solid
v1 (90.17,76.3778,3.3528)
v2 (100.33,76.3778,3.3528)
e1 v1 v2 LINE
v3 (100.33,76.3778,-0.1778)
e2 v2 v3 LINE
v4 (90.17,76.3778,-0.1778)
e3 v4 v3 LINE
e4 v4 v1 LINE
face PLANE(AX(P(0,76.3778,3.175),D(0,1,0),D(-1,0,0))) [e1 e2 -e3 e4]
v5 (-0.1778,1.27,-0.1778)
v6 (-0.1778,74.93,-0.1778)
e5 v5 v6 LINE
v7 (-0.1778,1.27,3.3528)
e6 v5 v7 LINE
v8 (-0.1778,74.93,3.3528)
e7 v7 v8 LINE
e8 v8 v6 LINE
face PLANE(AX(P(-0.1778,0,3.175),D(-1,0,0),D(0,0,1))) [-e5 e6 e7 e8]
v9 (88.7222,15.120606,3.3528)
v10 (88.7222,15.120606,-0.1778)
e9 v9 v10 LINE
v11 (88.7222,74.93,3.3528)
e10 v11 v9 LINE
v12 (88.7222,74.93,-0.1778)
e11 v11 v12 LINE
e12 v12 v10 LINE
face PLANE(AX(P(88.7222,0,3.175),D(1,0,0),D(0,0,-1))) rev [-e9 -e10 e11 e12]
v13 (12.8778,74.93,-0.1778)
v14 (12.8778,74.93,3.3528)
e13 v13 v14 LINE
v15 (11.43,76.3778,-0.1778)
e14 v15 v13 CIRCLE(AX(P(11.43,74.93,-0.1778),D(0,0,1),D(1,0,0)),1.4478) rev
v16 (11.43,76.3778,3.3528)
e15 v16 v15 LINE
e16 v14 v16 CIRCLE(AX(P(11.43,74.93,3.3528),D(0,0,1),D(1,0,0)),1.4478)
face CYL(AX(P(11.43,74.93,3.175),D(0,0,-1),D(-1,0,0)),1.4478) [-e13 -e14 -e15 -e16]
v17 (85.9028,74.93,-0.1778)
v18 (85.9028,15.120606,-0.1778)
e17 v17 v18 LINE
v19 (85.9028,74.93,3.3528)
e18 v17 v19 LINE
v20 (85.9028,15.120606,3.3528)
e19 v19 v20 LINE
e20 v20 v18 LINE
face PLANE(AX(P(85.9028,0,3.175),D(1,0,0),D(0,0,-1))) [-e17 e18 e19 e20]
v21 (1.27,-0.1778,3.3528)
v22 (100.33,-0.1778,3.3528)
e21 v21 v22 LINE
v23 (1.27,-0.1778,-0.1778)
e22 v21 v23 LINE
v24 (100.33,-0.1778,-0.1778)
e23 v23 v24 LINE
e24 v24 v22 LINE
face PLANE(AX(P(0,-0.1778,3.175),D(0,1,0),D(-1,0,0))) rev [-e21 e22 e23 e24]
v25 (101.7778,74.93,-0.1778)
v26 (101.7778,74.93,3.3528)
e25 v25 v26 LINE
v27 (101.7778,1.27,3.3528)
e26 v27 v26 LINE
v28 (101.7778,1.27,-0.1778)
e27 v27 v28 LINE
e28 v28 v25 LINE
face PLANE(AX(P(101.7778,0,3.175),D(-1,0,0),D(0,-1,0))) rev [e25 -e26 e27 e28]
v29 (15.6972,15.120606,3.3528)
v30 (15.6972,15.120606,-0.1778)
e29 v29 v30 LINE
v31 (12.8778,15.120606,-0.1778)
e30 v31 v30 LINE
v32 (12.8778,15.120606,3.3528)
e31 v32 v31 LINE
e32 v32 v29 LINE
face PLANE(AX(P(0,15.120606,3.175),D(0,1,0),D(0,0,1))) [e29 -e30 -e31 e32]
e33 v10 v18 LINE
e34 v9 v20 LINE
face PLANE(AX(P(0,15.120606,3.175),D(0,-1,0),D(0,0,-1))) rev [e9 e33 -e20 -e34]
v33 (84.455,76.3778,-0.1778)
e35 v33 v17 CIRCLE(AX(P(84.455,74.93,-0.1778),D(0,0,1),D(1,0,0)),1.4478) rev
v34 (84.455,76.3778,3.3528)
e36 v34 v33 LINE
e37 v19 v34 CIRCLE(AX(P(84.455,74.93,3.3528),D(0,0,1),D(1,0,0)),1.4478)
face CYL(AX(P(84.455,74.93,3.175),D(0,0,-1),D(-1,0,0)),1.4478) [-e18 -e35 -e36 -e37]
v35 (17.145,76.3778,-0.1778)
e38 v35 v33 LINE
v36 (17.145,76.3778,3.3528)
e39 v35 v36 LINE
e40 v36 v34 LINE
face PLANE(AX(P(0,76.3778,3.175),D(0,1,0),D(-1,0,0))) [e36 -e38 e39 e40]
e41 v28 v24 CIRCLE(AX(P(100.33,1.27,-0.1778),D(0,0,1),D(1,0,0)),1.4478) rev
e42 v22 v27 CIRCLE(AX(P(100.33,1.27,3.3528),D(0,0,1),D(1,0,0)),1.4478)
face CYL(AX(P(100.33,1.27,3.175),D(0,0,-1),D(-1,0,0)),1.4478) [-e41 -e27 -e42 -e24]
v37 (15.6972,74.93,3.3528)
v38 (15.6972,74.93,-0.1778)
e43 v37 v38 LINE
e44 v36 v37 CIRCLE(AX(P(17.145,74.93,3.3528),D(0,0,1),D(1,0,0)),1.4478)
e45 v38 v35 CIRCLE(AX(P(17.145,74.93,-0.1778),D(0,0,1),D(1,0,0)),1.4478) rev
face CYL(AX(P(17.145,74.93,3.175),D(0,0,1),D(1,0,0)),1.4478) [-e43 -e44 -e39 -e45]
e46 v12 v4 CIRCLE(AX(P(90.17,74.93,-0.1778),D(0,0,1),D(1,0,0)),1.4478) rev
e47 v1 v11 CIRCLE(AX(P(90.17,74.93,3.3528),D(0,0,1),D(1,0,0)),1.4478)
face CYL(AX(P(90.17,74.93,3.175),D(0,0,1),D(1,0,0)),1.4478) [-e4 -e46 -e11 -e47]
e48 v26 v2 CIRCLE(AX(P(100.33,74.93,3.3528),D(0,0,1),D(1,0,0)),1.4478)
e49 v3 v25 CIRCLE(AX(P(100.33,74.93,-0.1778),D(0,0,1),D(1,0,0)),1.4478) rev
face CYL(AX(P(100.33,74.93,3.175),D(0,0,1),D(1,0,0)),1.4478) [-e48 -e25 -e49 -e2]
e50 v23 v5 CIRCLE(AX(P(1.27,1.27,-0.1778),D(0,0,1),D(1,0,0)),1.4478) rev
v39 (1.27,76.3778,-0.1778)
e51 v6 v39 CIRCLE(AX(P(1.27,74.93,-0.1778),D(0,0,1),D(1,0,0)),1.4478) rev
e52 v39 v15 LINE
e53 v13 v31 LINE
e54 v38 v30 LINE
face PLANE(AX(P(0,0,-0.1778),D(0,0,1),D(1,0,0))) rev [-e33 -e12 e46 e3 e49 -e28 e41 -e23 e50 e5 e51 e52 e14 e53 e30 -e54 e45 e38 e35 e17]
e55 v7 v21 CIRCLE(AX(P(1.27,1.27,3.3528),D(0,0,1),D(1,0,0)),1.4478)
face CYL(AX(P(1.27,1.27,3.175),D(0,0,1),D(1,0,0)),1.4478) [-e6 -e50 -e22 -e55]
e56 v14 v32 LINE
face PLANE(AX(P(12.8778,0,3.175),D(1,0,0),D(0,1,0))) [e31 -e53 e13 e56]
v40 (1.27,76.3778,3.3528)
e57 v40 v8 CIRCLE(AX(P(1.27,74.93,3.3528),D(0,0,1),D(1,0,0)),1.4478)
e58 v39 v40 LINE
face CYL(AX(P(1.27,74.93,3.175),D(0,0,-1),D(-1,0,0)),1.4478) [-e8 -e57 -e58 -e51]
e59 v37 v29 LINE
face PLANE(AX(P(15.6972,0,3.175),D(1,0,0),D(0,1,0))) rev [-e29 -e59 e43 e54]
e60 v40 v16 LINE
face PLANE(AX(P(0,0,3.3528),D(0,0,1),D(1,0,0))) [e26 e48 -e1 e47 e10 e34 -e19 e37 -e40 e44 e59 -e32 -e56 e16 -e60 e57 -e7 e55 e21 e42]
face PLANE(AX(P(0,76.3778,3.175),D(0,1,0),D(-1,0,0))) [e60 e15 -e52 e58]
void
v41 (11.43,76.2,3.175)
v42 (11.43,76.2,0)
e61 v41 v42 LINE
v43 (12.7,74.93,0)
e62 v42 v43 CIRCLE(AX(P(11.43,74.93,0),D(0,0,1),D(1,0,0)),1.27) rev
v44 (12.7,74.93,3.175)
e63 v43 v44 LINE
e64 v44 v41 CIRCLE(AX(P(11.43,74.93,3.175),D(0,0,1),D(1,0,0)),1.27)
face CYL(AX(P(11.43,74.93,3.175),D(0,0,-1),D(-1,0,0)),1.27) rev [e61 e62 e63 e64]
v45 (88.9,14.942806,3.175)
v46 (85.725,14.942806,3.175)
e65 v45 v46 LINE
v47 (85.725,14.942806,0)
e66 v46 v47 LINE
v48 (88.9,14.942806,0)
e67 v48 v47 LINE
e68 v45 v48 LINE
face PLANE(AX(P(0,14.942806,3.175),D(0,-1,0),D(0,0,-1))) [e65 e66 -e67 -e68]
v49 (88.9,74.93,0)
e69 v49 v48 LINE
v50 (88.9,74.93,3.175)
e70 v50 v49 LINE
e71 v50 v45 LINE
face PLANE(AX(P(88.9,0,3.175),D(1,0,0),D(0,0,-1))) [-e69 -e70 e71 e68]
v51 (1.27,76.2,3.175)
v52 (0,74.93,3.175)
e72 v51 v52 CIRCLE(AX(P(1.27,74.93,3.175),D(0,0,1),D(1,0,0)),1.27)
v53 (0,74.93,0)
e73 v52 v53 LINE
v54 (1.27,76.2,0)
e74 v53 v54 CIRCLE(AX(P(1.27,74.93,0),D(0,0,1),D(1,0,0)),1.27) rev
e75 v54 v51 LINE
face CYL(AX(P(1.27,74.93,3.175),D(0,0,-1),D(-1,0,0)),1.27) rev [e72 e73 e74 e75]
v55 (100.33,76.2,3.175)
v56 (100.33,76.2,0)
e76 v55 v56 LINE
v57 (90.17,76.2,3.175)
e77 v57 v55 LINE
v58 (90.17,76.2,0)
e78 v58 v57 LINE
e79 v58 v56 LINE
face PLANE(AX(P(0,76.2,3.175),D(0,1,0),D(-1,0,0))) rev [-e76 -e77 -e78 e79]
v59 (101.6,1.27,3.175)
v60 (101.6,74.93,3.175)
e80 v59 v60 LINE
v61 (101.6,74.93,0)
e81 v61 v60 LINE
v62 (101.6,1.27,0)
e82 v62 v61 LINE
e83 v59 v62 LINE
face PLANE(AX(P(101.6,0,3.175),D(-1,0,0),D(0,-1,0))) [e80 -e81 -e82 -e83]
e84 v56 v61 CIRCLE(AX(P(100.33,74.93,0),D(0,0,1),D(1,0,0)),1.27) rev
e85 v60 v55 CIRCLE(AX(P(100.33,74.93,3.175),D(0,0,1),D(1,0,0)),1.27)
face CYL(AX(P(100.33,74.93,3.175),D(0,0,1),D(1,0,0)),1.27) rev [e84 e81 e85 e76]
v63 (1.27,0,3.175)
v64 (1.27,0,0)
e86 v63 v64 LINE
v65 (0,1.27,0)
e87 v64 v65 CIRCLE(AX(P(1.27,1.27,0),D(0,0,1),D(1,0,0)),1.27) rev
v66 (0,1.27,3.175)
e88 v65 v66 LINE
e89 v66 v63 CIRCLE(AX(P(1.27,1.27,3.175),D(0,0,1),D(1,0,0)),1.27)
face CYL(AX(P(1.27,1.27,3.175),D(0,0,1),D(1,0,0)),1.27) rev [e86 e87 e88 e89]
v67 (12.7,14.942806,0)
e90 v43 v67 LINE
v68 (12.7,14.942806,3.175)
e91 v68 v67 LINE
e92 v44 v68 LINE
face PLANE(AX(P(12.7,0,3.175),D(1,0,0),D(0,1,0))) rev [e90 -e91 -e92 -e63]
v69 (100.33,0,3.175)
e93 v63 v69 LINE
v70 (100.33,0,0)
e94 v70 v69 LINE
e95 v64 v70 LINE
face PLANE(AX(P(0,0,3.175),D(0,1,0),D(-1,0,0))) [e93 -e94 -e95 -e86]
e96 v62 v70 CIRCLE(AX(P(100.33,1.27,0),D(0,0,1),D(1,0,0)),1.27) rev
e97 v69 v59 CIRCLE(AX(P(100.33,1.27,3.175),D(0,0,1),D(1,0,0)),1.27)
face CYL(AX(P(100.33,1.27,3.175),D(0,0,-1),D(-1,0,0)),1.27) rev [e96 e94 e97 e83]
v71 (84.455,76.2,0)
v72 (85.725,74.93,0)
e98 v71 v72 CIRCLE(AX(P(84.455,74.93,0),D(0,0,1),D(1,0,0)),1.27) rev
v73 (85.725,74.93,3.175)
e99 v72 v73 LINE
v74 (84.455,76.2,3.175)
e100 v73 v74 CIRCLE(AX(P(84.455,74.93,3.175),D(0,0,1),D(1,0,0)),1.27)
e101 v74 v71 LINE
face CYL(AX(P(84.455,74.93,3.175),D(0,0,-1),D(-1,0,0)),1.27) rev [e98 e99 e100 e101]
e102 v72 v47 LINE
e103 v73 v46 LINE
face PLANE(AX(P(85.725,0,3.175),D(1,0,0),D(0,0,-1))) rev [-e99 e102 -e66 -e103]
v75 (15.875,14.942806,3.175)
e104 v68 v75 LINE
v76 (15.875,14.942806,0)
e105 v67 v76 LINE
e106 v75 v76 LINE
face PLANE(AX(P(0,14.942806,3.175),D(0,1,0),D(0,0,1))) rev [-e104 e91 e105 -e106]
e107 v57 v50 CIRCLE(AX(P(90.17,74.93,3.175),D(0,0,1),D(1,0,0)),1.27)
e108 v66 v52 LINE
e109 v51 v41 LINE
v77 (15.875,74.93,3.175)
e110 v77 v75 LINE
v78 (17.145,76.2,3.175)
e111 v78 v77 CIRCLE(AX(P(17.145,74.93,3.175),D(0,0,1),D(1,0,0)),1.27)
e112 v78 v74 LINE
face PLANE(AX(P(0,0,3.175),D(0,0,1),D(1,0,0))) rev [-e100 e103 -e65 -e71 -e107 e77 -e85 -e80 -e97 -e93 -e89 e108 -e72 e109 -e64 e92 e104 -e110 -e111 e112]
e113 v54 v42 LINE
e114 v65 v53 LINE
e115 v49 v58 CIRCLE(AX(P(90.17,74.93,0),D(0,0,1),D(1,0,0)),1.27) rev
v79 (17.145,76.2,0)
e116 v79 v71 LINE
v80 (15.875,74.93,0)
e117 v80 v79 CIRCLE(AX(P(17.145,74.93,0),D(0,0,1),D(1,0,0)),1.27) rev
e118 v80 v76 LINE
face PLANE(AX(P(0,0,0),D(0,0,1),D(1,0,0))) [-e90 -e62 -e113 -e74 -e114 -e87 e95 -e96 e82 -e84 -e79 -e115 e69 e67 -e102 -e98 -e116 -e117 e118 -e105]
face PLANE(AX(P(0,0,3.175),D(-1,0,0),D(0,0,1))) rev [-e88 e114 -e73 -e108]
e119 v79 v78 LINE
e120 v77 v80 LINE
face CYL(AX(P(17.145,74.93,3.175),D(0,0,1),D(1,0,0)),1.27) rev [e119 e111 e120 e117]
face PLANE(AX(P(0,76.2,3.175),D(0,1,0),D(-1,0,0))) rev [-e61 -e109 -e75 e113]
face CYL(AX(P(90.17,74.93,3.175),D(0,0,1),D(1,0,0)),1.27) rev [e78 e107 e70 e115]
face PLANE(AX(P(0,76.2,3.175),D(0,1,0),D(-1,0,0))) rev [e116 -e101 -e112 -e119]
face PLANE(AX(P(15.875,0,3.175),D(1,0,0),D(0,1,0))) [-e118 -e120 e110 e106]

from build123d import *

# Parameters (mm, degrees)
BOSS_EXTRUDE1_DEPTH = 3.175
FILLET5_R           = 1.27
SHELL2_START        = -0.1778
SHELL2_OUTLINE_W    = 75.8444
SHELL2_OUTLINE_H    = 3.5306
SHELL2_DEPTH        = 0.1778
SHELL2_START_2      = 14.942805851
SHELL2_2_OUTLINE_W  = 2.8194
SHELL2_2_OUTLINE_H  = 3.5306
SHELL2_2_DEPTH      = 0.1778
SHELL2_3_DEPTH      = 3.175
SHELL2_4_DEPTH      = 0.1778
SHELL2_START_3      = 3.175
SHELL2_5_DEPTH      = 0.1778
SHELL2_6_DEPTH      = 3.5306


with BuildPart() as part:
    # Sketch1 → Boss-Extrude1 (new body)
    with BuildSketch(Plane.XY):
        Polygon((50.8, 0), (50.8, 76.2), (15.875, 76.2), (15.875, 14.942805851), (12.7, 14.942805851), (12.7, 76.2), (0, 76.2), (0, 0), align=None)
        Polygon((85.725, 76.2), (50.8, 76.2), (50.8, 0), (101.6, 0), (101.6, 76.2), (88.9, 76.2), (88.9, 14.942805851), (85.725, 14.942805851), align=None)
    extrude(amount=BOSS_EXTRUDE1_DEPTH)

    # Fillet5
    fillet5_edges = [part.edges().sort_by_distance(p)[0] for p in [
        (0, 0, 1.5875),
        (0, 76.2, 1.5875),
        (12.7, 76.2, 1.5875),
        (15.875, 76.2, 1.5875),
        (85.725, 76.2, 1.5875),
        (88.9, 76.2, 1.5875),
        (101.6, 76.2, 1.5875),
        (101.6, 0, 1.5875),
    ]]
    fillet(fillet5_edges, radius=FILLET5_R)

    # Shell2: read off the stored shape, not the designer's step
    # Shell2 outline → Shell2 (add)
    with BuildSketch(Plane(origin=(0, 0, 0), x_dir=(1, 0, 0), z_dir=(0, 1, 0)).offset(SHELL2_START)):
        with Locations((50.8, -1.5875)):
            Rectangle(SHELL2_OUTLINE_W, SHELL2_OUTLINE_H)
    extrude(amount=SHELL2_DEPTH)

    # Shell2 2 outline → Shell2 2 (add)
    with BuildSketch(Plane(origin=(0, 0, 0), x_dir=(1, 0, 0), z_dir=(0, 1, 0)).offset(SHELL2_START_2)):
        with Locations((87.3125, -1.5875)):
            Rectangle(SHELL2_2_OUTLINE_W, SHELL2_2_OUTLINE_H)
        with Locations((14.2875, -1.5875)):
            Rectangle(SHELL2_2_OUTLINE_W, SHELL2_2_OUTLINE_H)
    extrude(amount=SHELL2_2_DEPTH)

    # Shell2 3 outline → Shell2 3 (cut)
    with BuildSketch(Plane.XY):
        with BuildLine():
            Line((1.27, 0), (100.33, 0))
            ThreePointArc((100.33, 0), (101.228025612, 0.371974388), (101.6, 1.27))
            Line((101.6, 1.27), (101.6, 74.93))
            ThreePointArc((101.6, 74.93), (101.228025612, 75.828025612), (100.33, 76.2))
            Line((100.33, 76.2), (90.17, 76.2))
            ThreePointArc((90.17, 76.2), (89.271974388, 75.828025612), (88.9, 74.93))
            Line((88.9, 74.93), (88.9, 14.942805851))
            Line((88.9, 14.942805851), (85.725, 14.942805851))
            Line((85.725, 14.942805851), (85.725, 74.93))
            ThreePointArc((85.725, 74.93), (85.353025612, 75.828025612), (84.455, 76.2))
            Line((84.455, 76.2), (17.145, 76.2))
            ThreePointArc((17.145, 76.2), (16.246974388, 75.828025612), (15.875, 74.93))
            Line((15.875, 74.93), (15.875, 14.942805851))
            Line((15.875, 14.942805851), (12.7, 14.942805851))
            Line((12.7, 14.942805851), (12.7, 74.93))
            ThreePointArc((12.7, 74.93), (12.328025612, 75.828025612), (11.43, 76.2))
            Line((11.43, 76.2), (1.27, 76.2))
            ThreePointArc((1.27, 76.2), (0.371974388, 75.828025612), (0, 74.93))
            Line((0, 74.93), (0, 1.27))
            ThreePointArc((0, 1.27), (0.371974388, 0.371974388), (1.27, 0))
        make_face()
    extrude(amount=SHELL2_3_DEPTH, mode=Mode.SUBTRACT)

    # Shell2 4 outline → Shell2 4 (add)
    with BuildSketch(Plane.XY.offset(SHELL2_START)):
        with BuildLine():
            Line((88.7222, -0.1778), (100.33, -0.1778))
            ThreePointArc((100.33, -0.1778), (101.353749198, 0.246250802), (101.7778, 1.27))
            Line((101.7778, 1.27), (101.7778, 74.93))
            ThreePointArc((101.7778, 74.93), (101.353749198, 75.953749198), (100.33, 76.3778))
            Line((100.33, 76.3778), (90.17, 76.3778))
            ThreePointArc((90.17, 76.3778), (89.146250802, 75.953749198), (88.7222, 74.93))
            Line((88.7222, 74.93), (88.7222, 14.942805851))
            Line((88.7222, 14.942805851), (85.9028, 14.942805851))
            Line((85.9028, 14.942805851), (85.9028, 74.93))
            ThreePointArc((85.9028, 74.93), (85.478749198, 75.953749198), (84.455, 76.3778))
            Line((84.455, 76.3778), (17.145, 76.3778))
            ThreePointArc((17.145, 76.3778), (16.121250802, 75.953749198), (15.6972, 74.93))
            Line((15.6972, 74.93), (15.6972, 14.942805851))
            Line((15.6972, 14.942805851), (12.8778, 14.942805851))
            Line((12.8778, 14.942805851), (12.8778, 74.93))
            ThreePointArc((12.8778, 74.93), (12.453749198, 75.953749198), (11.43, 76.3778))
            Line((11.43, 76.3778), (1.27, 76.3778))
            ThreePointArc((1.27, 76.3778), (0.246250802, 75.953749198), (-0.1778, 74.93))
            Line((-0.1778, 74.93), (-0.1778, 1.27))
            ThreePointArc((-0.1778, 1.27), (0.246250802, 0.246250802), (1.27, -0.1778))
            Line((1.27, -0.1778), (12.8778, -0.1778))
            Line((12.8778, -0.1778), (12.8778, 0))
            Line((12.8778, 0), (88.7222, 0))
            Line((88.7222, 0), (88.7222, -0.1778))
        make_face()
    extrude(amount=SHELL2_4_DEPTH)

    # Shell2 5 outline → Shell2 5 (add)
    with BuildSketch(Plane.XY.offset(SHELL2_START_3)):
        with BuildLine():
            Line((88.7222, -0.1778), (100.33, -0.1778))
            ThreePointArc((100.33, -0.1778), (101.353749198, 0.246250802), (101.7778, 1.27))
            Line((101.7778, 1.27), (101.7778, 74.93))
            ThreePointArc((101.7778, 74.93), (101.353749198, 75.953749198), (100.33, 76.3778))
            Line((100.33, 76.3778), (90.17, 76.3778))
            ThreePointArc((90.17, 76.3778), (89.146250802, 75.953749198), (88.7222, 74.93))
            Line((88.7222, 74.93), (88.7222, 14.942805851))
            Line((88.7222, 14.942805851), (85.9028, 14.942805851))
            Line((85.9028, 14.942805851), (85.9028, 74.93))
            ThreePointArc((85.9028, 74.93), (85.478749198, 75.953749198), (84.455, 76.3778))
            Line((84.455, 76.3778), (17.145, 76.3778))
            ThreePointArc((17.145, 76.3778), (16.121250802, 75.953749198), (15.6972, 74.93))
            Line((15.6972, 74.93), (15.6972, 14.942805851))
            Line((15.6972, 14.942805851), (12.8778, 14.942805851))
            Line((12.8778, 14.942805851), (12.8778, 74.93))
            ThreePointArc((12.8778, 74.93), (12.453749198, 75.953749198), (11.43, 76.3778))
            Line((11.43, 76.3778), (1.27, 76.3778))
            ThreePointArc((1.27, 76.3778), (0.246250802, 75.953749198), (-0.1778, 74.93))
            Line((-0.1778, 74.93), (-0.1778, 1.27))
            ThreePointArc((-0.1778, 1.27), (0.246250802, 0.246250802), (1.27, -0.1778))
            Line((1.27, -0.1778), (12.8778, -0.1778))
            Line((12.8778, -0.1778), (12.8778, 0))
            Line((12.8778, 0), (88.7222, 0))
            Line((88.7222, 0), (88.7222, -0.1778))
        make_face()
    extrude(amount=SHELL2_5_DEPTH)

    # Shell2 6 outline → Shell2 6 (add)
    with BuildSketch(Plane.XY.offset(SHELL2_START)):
        with BuildLine():
            Line((88.7222, -0.1778), (100.33, -0.1778))
            ThreePointArc((100.33, -0.1778), (101.353749198, 0.246250802), (101.7778, 1.27))
            Line((101.7778, 1.27), (101.7778, 74.93))
            ThreePointArc((101.7778, 74.93), (101.353749198, 75.953749198), (100.33, 76.3778))
            Line((100.33, 76.3778), (90.17, 76.3778))
            ThreePointArc((90.17, 76.3778), (89.146250802, 75.953749198), (88.7222, 74.93))
            Line((88.7222, 74.93), (88.7222, 14.942805851))
            Line((88.7222, 14.942805851), (88.9, 14.942805851))
            Line((88.9, 14.942805851), (88.9, 74.93))
            ThreePointArc((88.9, 74.93), (89.271974388, 75.828025612), (90.17, 76.2))
            Line((90.17, 76.2), (100.33, 76.2))
            ThreePointArc((100.33, 76.2), (101.228025612, 75.828025612), (101.6, 74.93))
            Line((101.6, 74.93), (101.6, 1.27))
            ThreePointArc((101.6, 1.27), (101.228025612, 0.371974388), (100.33, 0))
            Line((100.33, 0), (88.7222, 0))
            Line((88.7222, 0), (88.7222, -0.1778))
        make_face()
        with BuildLine():
            Line((1.27, -0.1778), (12.8778, -0.1778))
            Line((12.8778, -0.1778), (12.8778, 0))
            Line((12.8778, 0), (1.27, 0))
            ThreePointArc((1.27, 0), (0.371974388, 0.371974388), (0, 1.27))
            Line((0, 1.27), (0, 74.93))
            ThreePointArc((0, 74.93), (0.371974388, 75.828025612), (1.27, 76.2))
            Line((1.27, 76.2), (11.43, 76.2))
            ThreePointArc((11.43, 76.2), (12.328025612, 75.828025612), (12.7, 74.93))
            Line((12.7, 74.93), (12.7, 14.942805851))
            Line((12.7, 14.942805851), (12.8778, 14.942805851))
            Line((12.8778, 14.942805851), (12.8778, 74.93))
            ThreePointArc((12.8778, 74.93), (12.453749198, 75.953749198), (11.43, 76.3778))
            Line((11.43, 76.3778), (1.27, 76.3778))
            ThreePointArc((1.27, 76.3778), (0.246250802, 75.953749198), (-0.1778, 74.93))
            Line((-0.1778, 74.93), (-0.1778, 1.27))
            ThreePointArc((-0.1778, 1.27), (0.246250802, 0.246250802), (1.27, -0.1778))
        make_face()
        with BuildLine():
            Line((85.725, 14.942805851), (85.9028, 14.942805851))
            Line((85.9028, 14.942805851), (85.9028, 74.93))
            ThreePointArc((85.9028, 74.93), (85.478749198, 75.953749198), (84.455, 76.3778))
            Line((84.455, 76.3778), (17.145, 76.3778))
            ThreePointArc((17.145, 76.3778), (16.121250802, 75.953749198), (15.6972, 74.93))
            Line((15.6972, 74.93), (15.6972, 14.942805851))
            Line((15.6972, 14.942805851), (15.875, 14.942805851))
            Line((15.875, 14.942805851), (15.875, 74.93))
            ThreePointArc((15.875, 74.93), (16.246974388, 75.828025612), (17.145, 76.2))
            Line((17.145, 76.2), (84.455, 76.2))
            ThreePointArc((84.455, 76.2), (85.353025612, 75.828025612), (85.725, 74.93))
            Line((85.725, 74.93), (85.725, 14.942805851))
        make_face()
    extrude(amount=SHELL2_6_DEPTH)


solid = part.part
